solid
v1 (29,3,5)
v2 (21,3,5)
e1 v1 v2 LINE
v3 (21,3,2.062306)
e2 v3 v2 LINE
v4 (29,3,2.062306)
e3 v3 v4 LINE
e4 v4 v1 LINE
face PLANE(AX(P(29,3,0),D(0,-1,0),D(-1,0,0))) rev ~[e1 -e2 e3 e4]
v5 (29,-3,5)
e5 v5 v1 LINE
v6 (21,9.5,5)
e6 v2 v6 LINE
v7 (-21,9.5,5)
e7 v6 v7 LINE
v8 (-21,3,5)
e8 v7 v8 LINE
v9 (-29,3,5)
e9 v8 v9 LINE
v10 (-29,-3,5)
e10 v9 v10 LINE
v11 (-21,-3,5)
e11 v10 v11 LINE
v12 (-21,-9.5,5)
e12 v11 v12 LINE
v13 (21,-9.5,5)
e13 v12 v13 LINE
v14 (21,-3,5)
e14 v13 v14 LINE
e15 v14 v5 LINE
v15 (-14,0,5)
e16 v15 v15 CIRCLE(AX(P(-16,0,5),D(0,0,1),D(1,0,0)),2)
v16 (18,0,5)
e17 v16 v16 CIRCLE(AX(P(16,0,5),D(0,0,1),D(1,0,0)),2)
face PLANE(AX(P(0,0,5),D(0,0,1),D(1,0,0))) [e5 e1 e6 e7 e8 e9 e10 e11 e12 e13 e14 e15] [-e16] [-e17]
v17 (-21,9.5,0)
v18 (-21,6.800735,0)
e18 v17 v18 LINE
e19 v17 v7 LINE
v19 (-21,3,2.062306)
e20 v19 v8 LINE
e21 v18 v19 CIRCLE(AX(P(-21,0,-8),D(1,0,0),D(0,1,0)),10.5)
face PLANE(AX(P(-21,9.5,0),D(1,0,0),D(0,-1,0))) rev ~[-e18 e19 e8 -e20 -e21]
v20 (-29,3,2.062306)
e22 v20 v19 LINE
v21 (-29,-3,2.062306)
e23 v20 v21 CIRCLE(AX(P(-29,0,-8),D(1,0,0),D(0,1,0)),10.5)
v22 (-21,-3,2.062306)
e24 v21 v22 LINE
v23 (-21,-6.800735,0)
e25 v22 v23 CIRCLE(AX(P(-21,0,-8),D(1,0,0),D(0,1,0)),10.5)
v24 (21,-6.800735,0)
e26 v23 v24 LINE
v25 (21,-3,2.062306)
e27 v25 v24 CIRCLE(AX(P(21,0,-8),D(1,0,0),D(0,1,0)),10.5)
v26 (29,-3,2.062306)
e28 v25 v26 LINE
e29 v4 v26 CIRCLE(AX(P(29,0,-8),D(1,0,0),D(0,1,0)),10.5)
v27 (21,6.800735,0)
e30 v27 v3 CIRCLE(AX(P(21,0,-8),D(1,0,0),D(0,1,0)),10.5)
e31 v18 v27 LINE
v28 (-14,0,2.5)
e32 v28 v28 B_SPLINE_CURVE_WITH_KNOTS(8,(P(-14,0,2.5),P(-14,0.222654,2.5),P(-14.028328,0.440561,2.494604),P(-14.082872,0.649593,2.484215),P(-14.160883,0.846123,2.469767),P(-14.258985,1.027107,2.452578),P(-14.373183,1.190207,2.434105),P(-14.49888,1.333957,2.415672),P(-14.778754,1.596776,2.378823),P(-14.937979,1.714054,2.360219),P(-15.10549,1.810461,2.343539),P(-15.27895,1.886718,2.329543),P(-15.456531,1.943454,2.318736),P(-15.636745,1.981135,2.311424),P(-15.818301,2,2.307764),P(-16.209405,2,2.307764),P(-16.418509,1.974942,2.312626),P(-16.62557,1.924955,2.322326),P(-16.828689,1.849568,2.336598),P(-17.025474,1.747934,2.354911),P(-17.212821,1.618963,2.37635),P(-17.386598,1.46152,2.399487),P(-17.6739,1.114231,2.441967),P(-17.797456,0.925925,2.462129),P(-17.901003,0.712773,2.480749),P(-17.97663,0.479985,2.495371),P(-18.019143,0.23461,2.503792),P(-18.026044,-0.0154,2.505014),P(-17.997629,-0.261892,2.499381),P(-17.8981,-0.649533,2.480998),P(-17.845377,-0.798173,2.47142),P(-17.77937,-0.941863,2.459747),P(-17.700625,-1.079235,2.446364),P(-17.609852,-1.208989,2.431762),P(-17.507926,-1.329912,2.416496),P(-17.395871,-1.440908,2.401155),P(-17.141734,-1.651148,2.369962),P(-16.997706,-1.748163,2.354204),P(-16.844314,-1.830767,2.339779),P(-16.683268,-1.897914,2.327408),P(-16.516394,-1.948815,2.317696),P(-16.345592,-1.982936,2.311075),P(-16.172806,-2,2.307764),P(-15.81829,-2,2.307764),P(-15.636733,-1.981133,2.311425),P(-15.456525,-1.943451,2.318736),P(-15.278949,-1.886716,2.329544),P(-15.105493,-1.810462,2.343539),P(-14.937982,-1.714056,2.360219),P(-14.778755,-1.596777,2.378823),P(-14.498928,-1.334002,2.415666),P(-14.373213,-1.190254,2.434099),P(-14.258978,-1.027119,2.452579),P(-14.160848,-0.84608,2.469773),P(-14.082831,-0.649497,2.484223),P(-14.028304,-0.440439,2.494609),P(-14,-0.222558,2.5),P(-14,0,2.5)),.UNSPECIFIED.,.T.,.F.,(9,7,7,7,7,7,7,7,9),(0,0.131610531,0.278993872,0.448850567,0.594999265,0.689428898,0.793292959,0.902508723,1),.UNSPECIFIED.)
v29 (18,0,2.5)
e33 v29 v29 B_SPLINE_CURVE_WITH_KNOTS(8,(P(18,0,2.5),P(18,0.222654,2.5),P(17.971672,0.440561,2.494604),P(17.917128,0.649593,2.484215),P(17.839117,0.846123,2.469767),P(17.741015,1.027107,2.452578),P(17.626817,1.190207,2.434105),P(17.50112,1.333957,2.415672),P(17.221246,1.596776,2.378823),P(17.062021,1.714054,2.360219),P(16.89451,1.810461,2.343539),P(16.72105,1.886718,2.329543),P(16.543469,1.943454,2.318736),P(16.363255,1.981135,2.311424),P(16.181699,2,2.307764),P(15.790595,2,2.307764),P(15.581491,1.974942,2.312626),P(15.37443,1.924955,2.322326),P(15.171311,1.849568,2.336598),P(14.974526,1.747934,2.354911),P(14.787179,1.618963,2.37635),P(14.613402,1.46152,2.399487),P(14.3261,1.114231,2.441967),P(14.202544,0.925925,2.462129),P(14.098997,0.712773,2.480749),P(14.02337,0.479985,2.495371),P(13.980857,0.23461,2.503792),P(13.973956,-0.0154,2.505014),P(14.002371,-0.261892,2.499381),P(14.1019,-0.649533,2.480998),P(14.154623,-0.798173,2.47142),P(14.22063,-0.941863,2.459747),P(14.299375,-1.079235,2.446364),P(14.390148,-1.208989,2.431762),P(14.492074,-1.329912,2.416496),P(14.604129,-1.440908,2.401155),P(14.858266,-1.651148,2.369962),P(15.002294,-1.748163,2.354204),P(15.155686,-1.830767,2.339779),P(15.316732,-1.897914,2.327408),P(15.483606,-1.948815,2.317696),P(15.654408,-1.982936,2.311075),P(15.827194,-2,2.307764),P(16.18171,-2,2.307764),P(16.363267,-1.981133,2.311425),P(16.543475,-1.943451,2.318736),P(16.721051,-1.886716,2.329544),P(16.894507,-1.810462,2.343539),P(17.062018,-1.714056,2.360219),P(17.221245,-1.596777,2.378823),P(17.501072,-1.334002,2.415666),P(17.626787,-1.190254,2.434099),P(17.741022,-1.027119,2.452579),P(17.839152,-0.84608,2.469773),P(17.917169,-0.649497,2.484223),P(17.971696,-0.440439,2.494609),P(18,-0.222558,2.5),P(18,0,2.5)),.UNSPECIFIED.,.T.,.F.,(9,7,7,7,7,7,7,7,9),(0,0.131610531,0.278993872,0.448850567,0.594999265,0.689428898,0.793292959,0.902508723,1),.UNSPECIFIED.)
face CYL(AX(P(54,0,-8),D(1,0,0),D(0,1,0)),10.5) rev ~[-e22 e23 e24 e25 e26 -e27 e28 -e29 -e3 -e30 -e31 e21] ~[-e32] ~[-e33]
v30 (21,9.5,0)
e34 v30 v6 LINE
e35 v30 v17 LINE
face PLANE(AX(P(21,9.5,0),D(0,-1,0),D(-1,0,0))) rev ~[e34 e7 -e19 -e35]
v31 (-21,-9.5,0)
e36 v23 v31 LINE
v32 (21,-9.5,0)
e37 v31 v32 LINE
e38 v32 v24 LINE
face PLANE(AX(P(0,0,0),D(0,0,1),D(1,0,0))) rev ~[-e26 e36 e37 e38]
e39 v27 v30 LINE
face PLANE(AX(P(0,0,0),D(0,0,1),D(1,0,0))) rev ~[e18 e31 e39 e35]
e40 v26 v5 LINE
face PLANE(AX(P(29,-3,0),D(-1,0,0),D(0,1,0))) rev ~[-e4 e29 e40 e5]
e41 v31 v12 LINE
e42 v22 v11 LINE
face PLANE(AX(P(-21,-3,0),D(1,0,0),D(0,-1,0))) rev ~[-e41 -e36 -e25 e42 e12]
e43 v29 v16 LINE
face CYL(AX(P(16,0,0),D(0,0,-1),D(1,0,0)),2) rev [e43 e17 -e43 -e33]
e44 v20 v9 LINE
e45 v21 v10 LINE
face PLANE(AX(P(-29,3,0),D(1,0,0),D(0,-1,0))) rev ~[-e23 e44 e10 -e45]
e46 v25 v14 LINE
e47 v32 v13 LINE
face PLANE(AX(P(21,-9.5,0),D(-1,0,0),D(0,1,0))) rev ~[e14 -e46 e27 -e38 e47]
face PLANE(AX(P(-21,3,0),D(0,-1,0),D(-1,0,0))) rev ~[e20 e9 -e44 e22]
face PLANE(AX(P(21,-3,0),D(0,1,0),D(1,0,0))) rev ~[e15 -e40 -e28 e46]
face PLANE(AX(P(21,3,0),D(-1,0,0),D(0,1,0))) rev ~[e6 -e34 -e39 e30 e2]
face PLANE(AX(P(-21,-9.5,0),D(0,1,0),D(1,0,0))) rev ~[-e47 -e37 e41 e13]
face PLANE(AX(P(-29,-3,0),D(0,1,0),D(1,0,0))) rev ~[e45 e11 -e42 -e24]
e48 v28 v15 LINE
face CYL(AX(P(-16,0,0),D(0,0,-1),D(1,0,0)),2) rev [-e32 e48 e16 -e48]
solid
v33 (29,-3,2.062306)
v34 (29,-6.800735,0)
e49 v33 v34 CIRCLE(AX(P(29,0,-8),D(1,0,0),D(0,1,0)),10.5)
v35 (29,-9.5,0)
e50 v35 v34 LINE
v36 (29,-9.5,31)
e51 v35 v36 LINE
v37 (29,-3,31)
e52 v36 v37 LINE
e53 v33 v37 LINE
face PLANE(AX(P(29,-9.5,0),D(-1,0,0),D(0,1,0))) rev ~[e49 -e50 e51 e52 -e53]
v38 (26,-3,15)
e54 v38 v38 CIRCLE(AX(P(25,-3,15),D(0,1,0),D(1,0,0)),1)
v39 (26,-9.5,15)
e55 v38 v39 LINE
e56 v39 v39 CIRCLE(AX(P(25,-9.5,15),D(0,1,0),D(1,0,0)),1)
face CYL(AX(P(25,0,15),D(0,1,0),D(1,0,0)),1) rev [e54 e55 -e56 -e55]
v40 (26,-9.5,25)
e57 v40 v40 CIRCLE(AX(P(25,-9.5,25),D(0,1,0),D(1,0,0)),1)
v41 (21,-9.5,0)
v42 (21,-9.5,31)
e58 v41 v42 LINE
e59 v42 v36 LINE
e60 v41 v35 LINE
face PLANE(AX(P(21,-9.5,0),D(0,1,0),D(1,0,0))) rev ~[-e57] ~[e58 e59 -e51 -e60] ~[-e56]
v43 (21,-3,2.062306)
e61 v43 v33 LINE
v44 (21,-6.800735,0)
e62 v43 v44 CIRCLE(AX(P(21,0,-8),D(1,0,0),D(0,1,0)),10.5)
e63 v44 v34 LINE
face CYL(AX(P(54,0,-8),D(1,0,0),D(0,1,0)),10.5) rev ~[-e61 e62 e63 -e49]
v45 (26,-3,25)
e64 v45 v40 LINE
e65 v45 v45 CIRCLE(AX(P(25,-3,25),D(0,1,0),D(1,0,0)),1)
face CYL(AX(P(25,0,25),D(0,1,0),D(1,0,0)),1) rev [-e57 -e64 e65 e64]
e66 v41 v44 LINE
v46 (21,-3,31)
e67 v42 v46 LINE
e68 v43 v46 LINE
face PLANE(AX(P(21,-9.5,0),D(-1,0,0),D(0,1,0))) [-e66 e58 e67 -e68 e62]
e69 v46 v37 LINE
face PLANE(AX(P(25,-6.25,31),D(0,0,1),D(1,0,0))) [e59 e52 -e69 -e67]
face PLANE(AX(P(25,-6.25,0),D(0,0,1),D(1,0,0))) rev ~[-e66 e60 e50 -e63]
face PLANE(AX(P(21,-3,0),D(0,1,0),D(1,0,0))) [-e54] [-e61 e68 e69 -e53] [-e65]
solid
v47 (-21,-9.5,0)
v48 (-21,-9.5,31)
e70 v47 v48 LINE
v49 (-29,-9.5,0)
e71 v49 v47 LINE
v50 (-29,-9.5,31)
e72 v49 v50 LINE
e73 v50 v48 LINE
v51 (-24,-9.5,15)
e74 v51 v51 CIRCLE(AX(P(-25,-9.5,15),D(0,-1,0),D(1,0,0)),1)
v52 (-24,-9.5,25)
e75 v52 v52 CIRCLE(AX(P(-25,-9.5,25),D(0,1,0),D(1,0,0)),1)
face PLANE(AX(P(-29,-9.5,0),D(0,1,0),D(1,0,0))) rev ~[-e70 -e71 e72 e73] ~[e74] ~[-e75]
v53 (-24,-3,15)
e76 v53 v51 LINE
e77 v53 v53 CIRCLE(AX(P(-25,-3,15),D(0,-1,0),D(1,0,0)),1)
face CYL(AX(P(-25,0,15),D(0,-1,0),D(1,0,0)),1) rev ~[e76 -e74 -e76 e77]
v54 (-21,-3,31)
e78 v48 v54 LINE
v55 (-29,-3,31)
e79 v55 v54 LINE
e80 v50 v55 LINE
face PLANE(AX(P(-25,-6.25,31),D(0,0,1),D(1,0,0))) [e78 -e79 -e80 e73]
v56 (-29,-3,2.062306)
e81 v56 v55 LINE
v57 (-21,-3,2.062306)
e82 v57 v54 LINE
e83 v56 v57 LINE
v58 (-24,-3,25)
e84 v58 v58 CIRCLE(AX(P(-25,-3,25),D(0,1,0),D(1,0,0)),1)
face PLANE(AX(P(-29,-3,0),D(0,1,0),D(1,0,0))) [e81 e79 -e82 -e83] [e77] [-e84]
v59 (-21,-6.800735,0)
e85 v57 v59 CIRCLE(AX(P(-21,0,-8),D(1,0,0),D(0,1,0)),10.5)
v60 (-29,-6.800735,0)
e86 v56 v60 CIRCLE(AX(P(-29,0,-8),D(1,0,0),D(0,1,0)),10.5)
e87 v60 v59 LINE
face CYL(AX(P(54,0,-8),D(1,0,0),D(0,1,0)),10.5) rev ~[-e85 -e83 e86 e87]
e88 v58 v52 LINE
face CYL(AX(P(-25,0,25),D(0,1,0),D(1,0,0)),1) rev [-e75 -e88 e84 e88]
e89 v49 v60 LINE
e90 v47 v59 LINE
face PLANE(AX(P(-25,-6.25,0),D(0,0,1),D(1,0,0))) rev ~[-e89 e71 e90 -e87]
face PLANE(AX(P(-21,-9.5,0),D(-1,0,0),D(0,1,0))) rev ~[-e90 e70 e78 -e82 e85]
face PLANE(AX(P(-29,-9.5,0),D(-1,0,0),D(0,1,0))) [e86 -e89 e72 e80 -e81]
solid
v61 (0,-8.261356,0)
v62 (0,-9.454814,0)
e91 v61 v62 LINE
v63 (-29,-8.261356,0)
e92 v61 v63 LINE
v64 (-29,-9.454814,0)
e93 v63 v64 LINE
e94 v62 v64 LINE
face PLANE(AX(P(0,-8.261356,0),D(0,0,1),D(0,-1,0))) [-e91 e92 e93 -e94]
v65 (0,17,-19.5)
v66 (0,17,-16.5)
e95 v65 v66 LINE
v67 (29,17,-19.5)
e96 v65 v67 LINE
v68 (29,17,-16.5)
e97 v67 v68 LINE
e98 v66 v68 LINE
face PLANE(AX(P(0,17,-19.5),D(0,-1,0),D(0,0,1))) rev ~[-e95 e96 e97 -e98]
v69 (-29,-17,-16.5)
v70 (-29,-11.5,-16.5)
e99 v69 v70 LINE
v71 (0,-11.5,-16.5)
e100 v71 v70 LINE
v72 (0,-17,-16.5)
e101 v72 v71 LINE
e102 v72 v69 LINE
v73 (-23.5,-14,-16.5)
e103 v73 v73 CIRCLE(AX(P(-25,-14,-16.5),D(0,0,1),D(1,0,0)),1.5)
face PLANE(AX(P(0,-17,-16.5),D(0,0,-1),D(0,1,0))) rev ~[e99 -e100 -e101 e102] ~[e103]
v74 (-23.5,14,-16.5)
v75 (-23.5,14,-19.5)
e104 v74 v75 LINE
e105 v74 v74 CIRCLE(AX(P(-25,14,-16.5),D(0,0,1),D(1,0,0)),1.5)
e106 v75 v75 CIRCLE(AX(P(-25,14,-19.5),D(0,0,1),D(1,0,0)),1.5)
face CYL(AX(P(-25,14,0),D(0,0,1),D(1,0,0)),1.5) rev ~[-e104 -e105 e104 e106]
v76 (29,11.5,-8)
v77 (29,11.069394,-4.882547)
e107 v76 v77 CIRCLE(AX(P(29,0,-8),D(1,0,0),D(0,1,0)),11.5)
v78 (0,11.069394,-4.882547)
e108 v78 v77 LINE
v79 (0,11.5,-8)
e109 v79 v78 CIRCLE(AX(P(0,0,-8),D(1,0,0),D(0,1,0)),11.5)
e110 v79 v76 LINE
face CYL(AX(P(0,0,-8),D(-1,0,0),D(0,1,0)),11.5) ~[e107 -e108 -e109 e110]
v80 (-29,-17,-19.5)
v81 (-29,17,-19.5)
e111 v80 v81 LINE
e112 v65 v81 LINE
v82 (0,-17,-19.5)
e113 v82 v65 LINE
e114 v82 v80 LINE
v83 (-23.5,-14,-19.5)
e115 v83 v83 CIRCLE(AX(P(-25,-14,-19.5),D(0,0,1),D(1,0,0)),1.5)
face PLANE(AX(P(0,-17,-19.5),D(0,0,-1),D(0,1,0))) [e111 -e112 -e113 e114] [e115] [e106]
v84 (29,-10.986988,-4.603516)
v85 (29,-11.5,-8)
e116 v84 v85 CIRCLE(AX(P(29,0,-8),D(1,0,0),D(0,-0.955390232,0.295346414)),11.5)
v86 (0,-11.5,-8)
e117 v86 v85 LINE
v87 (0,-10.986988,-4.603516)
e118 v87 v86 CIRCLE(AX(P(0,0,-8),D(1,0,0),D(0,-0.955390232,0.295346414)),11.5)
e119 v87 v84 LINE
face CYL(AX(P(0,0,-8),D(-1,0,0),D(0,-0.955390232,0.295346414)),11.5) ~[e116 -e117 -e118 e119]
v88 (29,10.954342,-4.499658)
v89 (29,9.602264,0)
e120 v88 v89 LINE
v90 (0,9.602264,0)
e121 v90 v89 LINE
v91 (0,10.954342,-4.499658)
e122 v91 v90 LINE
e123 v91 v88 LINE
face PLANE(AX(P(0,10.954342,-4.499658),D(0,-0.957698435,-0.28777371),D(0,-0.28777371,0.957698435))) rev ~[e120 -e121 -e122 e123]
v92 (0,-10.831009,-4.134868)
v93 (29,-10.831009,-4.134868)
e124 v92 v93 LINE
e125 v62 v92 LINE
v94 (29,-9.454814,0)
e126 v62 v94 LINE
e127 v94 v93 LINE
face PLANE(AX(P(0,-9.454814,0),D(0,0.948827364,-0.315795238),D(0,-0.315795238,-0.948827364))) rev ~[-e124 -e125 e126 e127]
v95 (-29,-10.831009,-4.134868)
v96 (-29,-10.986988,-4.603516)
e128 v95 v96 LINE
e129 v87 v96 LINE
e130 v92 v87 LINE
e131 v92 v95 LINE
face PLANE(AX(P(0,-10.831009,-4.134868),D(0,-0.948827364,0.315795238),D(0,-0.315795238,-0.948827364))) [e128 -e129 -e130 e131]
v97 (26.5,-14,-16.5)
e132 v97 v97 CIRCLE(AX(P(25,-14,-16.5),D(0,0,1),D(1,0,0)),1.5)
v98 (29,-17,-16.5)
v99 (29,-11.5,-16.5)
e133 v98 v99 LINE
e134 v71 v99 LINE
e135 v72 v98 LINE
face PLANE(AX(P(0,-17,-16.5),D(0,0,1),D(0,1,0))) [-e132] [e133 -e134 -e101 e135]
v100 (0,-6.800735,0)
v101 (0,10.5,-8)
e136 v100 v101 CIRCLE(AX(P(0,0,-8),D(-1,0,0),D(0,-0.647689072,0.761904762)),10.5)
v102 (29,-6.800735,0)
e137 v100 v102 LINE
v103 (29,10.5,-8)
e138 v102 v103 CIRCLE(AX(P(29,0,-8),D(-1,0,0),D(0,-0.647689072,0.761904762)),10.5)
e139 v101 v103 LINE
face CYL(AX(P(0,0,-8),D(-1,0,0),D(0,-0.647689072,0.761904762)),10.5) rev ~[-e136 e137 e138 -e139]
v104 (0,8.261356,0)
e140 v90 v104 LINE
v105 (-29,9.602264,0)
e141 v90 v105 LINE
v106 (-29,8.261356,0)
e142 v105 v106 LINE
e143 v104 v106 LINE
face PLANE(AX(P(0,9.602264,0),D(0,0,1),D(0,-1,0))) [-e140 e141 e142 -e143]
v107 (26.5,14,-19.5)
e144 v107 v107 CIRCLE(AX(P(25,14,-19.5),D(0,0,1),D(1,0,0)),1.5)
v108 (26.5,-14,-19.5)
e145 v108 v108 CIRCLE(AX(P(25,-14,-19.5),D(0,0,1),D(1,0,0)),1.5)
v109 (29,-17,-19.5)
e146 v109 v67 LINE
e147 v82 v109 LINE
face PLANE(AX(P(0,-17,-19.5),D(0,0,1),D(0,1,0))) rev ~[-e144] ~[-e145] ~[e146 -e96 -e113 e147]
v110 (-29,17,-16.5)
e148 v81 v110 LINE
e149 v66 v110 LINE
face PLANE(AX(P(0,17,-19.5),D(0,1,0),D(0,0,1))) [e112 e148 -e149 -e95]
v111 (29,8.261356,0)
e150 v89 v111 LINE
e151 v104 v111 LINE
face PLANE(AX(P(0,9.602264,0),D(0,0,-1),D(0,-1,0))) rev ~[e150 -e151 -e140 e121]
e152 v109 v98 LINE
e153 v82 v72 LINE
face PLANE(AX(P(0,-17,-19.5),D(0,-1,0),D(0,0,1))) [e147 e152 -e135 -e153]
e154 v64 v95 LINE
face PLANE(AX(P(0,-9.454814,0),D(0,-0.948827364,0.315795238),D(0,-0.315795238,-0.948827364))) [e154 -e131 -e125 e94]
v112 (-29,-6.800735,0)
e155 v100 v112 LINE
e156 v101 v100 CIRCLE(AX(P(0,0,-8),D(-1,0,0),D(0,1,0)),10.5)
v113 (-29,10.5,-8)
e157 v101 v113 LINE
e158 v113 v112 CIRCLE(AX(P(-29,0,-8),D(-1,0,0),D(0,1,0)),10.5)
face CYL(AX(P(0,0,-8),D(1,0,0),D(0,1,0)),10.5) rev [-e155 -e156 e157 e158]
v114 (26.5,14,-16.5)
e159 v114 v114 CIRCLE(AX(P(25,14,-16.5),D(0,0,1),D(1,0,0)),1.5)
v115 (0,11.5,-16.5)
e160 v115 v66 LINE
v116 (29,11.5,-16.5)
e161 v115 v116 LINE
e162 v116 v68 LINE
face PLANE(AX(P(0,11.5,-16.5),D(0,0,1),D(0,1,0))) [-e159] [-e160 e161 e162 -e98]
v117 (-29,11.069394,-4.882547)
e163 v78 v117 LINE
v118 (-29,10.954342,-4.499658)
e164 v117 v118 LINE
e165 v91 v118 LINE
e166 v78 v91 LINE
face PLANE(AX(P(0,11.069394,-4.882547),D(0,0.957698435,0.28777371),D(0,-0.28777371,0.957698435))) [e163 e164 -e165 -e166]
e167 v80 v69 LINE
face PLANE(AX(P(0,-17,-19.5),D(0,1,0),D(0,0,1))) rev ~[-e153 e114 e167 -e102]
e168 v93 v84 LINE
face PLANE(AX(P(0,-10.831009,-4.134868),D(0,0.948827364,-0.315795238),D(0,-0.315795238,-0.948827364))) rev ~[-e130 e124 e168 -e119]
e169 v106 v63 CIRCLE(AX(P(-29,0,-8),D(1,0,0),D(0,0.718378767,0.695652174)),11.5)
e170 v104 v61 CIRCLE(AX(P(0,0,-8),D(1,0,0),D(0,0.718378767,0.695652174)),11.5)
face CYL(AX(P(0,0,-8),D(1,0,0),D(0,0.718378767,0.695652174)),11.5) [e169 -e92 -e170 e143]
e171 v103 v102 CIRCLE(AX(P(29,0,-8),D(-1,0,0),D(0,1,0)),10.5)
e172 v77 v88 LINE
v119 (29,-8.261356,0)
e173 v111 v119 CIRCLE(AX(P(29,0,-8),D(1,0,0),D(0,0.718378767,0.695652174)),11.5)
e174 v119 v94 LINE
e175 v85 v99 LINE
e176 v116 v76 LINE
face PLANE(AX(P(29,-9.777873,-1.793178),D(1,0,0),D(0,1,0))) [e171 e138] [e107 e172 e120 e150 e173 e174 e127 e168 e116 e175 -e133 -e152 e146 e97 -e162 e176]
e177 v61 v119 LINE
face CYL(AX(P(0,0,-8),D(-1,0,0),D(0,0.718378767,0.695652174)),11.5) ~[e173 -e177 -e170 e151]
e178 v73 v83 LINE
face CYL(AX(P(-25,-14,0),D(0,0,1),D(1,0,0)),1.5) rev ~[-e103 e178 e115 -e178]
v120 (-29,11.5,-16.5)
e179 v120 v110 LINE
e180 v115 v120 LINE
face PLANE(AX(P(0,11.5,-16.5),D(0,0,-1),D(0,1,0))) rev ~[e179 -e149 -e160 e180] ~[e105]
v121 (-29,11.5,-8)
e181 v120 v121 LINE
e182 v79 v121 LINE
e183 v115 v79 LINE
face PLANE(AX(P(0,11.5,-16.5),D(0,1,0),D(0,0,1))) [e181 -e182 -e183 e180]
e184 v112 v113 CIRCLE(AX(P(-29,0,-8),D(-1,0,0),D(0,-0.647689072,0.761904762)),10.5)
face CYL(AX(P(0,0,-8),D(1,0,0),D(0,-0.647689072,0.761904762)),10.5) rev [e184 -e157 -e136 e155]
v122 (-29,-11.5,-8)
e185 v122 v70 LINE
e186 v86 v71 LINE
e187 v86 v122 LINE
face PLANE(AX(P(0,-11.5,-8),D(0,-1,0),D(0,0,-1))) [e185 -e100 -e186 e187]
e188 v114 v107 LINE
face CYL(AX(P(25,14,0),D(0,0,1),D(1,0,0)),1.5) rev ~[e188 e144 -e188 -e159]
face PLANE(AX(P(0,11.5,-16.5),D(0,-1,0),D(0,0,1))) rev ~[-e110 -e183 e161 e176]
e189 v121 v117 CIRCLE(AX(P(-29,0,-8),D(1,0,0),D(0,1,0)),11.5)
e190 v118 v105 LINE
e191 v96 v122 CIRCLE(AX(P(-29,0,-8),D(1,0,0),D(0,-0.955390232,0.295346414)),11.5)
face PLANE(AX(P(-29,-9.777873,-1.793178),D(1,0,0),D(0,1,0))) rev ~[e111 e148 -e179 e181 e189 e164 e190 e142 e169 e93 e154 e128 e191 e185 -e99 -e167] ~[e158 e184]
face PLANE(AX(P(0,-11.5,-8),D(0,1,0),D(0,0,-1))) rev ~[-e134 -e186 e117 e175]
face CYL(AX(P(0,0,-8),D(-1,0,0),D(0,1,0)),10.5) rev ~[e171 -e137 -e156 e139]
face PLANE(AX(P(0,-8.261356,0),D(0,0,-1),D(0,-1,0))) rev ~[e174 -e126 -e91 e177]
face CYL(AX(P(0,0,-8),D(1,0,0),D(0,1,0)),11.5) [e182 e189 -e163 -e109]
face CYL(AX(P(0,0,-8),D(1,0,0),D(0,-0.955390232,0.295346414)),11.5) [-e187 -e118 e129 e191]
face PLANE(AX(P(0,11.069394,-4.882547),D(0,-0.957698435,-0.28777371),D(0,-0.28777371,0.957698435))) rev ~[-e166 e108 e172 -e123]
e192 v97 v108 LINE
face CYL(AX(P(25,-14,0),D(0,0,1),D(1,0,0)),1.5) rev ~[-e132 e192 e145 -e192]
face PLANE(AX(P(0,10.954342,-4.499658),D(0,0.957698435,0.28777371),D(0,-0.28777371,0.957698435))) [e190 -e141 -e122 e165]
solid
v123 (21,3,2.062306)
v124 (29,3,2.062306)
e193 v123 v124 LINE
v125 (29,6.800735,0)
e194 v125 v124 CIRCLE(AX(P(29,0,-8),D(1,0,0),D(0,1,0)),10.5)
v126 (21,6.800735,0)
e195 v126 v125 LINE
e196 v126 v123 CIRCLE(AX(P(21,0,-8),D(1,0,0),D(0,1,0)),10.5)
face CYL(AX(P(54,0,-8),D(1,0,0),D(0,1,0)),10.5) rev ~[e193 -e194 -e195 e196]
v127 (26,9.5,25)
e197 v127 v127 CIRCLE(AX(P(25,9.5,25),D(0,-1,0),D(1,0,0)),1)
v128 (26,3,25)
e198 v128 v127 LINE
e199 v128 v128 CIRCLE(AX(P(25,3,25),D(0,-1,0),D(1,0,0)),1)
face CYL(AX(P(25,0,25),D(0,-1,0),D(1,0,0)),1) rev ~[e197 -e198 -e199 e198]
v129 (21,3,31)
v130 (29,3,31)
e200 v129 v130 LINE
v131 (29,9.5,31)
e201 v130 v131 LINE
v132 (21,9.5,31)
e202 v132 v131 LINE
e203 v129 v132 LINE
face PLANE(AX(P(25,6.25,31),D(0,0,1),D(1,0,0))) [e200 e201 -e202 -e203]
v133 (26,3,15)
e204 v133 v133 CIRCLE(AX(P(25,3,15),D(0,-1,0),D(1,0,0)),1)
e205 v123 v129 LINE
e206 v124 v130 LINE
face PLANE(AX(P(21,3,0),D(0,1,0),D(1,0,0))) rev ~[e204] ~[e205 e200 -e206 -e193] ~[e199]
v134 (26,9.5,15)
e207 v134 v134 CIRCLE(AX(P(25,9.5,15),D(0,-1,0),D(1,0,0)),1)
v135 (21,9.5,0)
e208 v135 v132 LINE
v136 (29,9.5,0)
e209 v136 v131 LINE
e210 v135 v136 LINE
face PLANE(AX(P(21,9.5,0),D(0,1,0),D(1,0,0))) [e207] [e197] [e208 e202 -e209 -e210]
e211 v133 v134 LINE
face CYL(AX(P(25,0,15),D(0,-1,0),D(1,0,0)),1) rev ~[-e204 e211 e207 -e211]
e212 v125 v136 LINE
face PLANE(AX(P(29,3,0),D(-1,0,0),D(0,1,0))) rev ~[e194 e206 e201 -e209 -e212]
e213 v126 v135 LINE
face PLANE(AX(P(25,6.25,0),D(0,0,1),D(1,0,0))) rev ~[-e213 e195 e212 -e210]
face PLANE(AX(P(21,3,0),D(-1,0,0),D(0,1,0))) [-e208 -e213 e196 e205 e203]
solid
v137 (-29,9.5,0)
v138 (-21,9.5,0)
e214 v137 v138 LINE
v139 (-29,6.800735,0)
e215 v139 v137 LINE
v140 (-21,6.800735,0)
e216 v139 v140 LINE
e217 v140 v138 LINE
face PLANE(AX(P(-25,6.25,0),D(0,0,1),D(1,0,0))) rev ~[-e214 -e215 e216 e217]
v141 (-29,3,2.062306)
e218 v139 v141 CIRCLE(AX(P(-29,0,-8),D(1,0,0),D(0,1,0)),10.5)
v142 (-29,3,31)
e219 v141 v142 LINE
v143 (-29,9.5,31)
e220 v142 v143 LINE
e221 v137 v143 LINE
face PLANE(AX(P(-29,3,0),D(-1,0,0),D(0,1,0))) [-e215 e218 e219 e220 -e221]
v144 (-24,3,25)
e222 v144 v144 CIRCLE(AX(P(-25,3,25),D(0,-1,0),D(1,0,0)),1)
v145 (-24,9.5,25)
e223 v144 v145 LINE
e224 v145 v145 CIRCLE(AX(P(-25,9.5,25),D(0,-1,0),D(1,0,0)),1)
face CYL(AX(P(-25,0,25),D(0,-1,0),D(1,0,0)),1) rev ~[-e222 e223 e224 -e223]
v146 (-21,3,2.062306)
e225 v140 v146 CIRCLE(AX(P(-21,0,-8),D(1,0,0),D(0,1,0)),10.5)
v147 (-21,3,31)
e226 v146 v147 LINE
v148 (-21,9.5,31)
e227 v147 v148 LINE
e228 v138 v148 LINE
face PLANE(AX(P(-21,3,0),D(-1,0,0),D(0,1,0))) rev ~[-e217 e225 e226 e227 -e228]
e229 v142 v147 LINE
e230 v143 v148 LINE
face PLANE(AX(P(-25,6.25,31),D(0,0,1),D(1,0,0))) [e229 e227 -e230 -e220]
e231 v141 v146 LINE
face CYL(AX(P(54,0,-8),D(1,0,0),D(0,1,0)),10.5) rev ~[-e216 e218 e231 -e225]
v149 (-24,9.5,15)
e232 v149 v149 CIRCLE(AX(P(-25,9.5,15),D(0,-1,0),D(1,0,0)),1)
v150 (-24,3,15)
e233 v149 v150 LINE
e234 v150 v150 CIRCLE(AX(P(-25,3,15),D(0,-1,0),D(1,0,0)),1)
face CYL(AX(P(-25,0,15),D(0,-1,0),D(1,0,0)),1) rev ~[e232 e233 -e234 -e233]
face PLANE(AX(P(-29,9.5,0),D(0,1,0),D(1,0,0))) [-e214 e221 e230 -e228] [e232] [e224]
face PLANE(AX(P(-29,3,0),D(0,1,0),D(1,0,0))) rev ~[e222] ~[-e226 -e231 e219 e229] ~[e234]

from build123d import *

# Parameters (mm, degrees)
F0_W      = 8
F0_H      = 6.5
F1_DEPTH  = 31
F0_R      = 2
F2_DEPTH  = 5
F3_R      = 1
F4_DEPTH  = 12.5
F5_W      = 5.5
F5_H      = 3
F6_DEPTH  = 29
F9_R      = 10.5
F10_DEPTH = 83.001
F0_R_2    = 1.5
F11_DEPTH = 19.501


# Not quite as in the source:
# - the program builds the solid bodies; features that only make, move or delete a surface that nothing else refers to are left out


with BuildPart() as f1:
    # F0 (on Top) → F1 (new body)
    with BuildSketch(Plane.XY):
        with Locations((-25, 6.25)):
            Rectangle(F0_W, F0_H)
    extrude(amount=F1_DEPTH)


with BuildPart() as f1b:
    # F0 (on Top) → F1, piece 2 (new body)
    with BuildSketch(Plane.XY):
        with Locations((-25, -6.25)):
            Rectangle(F0_W, F0_H)
    extrude(amount=F1_DEPTH)


with BuildPart() as f1c:
    # F0 (on Top) → F1, piece 3 (new body)
    with BuildSketch(Plane.XY):
        with Locations((25, 6.25)):
            Rectangle(F0_W, F0_H)
    extrude(amount=F1_DEPTH)


with BuildPart() as f1d:
    # F0 (on Top) → F1, piece 4 (new body)
    with BuildSketch(Plane.XY):
        with Locations((25, -6.25)):
            Rectangle(F0_W, F0_H)
    extrude(amount=F1_DEPTH)


with BuildPart() as f2:
    # F0 (on Top) → F2 (new body)
    with BuildSketch(Plane.XY):
        Polygon((-21, -9.5), (21, -9.5), (21, -3), (29, -3), (29, 3), (21, 3), (21, 9.5), (-21, 9.5), (-21, 3), (-29, 3), (-29, -3), (-21, -3), align=None)
        with Locations((-16, 0)):
            Circle(F0_R, mode=Mode.SUBTRACT)
        with Locations((16, 0)):
            Circle(F0_R, mode=Mode.SUBTRACT)
    extrude(amount=F2_DEPTH)


with BuildPart() as f4_tool:
    # F3 (on Front) → F4 (new body, symmetric)
    with BuildSketch(Plane.XZ):
        with Locations((25, 25)):
            Circle(F3_R)
        with Locations((25, 15)):
            Circle(F3_R)
        with Locations((-25, 25)):
            Circle(F3_R)
        with Locations((-25, 15)):
            Circle(F3_R)
    extrude(amount=F4_DEPTH, both=True)


with BuildPart() as f1_1:
    add(f1.part)

    # F4: cut by f4_tool
    add(f4_tool.part, mode=Mode.SUBTRACT)


with BuildPart() as f1b_1:
    add(f1b.part)

    # F4: cut by f4_tool
    add(f4_tool.part, mode=Mode.SUBTRACT)


with BuildPart() as f1c_1:
    add(f1c.part)

    # F4: cut by f4_tool
    add(f4_tool.part, mode=Mode.SUBTRACT)


with BuildPart() as f1d_1:
    add(f1d.part)

    # F4: cut by f4_tool
    add(f4_tool.part, mode=Mode.SUBTRACT)


with BuildPart() as f6:
    # F5 (on Right) → F6 (new body, symmetric)
    with BuildSketch(Plane.YZ):
        with BuildLine():
            ThreePointArc((-10.8310090403, -4.1348682857), (-9.7674911279, -1.9298997482), (-8.2613558209, 0))
            Line((-8.2613558209, 0), (-9.4548137859, 0))
            Line((-9.4548137859, 0), (-10.8310090403, -4.1348682857))
        make_face()
        with BuildLine():
            ThreePointArc((6.8007352544, 0), (9.5304176239, -3.5930577591), (10.5, -8))
            ThreePointArc((10.5, -8), (-4.4069422409, -17.5304176239), (-6.8007352544, 0))
            Line((-6.8007352544, 0), (-8.2613558209, 0))
            ThreePointArc((-8.2613558209, 0), (-9.7674911279, -1.9298997482), (-10.8310090403, -4.1348682857))
            Line((-10.8310090403, -4.1348682857), (-10.9869876699, -4.6035162385))
            ThreePointArc((-10.9869876699, -4.6035162385), (-11.3710236611, -6.2824957356), (-11.5, -8))
            ThreePointArc((-11.5, -8), (-8.1317279836, -16.1317279836), (0, -19.5))
            ThreePointArc((0, -19.5), (8.1317279836, -16.1317279836), (11.5, -8))
            ThreePointArc((11.5, -8), (11.3918398808, -6.4264739816), (11.0693940642, -4.8825467043))
            Line((11.0693940642, -4.8825467043), (10.9543418745, -4.499658003))
            ThreePointArc((10.9543418745, -4.499658003), (9.8677499977, -2.0942815862), (8.2613558209, 0))
            Line((8.2613558209, 0), (6.8007352544, 0))
        make_face()
        with BuildLine():
            Line((9.6022635698, 0), (8.2613558209, 0))
            ThreePointArc((8.2613558209, 0), (9.8677499977, -2.0942815862), (10.9543418745, -4.499658003))
            Line((10.9543418745, -4.499658003), (9.6022635698, 0))
        make_face()
        with BuildLine():
            ThreePointArc((6.8007352544, 0), (9.5304176239, -3.5930577591), (10.5, -8))
            ThreePointArc((10.5, -8), (-4.4069422409, -17.5304176239), (-6.8007352544, 0))
            Line((-6.8007352544, 0), (-8.2613558209, 0))
            ThreePointArc((-8.2613558209, 0), (-9.7674911279, -1.9298997482), (-10.8310090403, -4.1348682857))
            Line((-10.8310090403, -4.1348682857), (-10.9869876699, -4.6035162385))
            ThreePointArc((-10.9869876699, -4.6035162385), (-11.3710236611, -6.2824957356), (-11.5, -8))
            ThreePointArc((-11.5, -8), (-8.1317279836, -16.1317279836), (0, -19.5))
            ThreePointArc((0, -19.5), (8.1317279836, -16.1317279836), (11.5, -8))
            ThreePointArc((11.5, -8), (11.3918398808, -6.4264739816), (11.0693940642, -4.8825467043))
            Line((11.0693940642, -4.8825467043), (10.9543418745, -4.499658003))
            ThreePointArc((10.9543418745, -4.499658003), (9.8677499977, -2.0942815862), (8.2613558209, 0))
            Line((8.2613558209, 0), (6.8007352544, 0))
        make_face()
        with BuildLine():
            ThreePointArc((-6.8007352544, 0), (0, 2.5), (6.8007352544, 0))
            Line((6.8007352544, 0), (8.2613558209, 0))
            ThreePointArc((8.2613558209, 0), (0, 3.5), (-8.2613558209, 0))
            Line((-8.2613558209, 0), (-6.8007352544, 0))
        make_face()
        with BuildLine():
            ThreePointArc((6.8007352544, 0), (9.5304176239, -3.5930577591), (10.5, -8))
            ThreePointArc((10.5, -8), (-4.4069422409, -17.5304176239), (-6.8007352544, 0))
            Line((-6.8007352544, 0), (-8.2613558209, 0))
            ThreePointArc((-8.2613558209, 0), (-9.7674911279, -1.9298997482), (-10.8310090403, -4.1348682857))
            Line((-10.8310090403, -4.1348682857), (-10.9869876699, -4.6035162385))
            ThreePointArc((-10.9869876699, -4.6035162385), (-11.3710236611, -6.2824957356), (-11.5, -8))
            ThreePointArc((-11.5, -8), (-8.1317279836, -16.1317279836), (0, -19.5))
            ThreePointArc((0, -19.5), (8.1317279836, -16.1317279836), (11.5, -8))
            ThreePointArc((11.5, -8), (11.3918398808, -6.4264739816), (11.0693940642, -4.8825467043))
            Line((11.0693940642, -4.8825467043), (10.9543418745, -4.499658003))
            ThreePointArc((10.9543418745, -4.499658003), (9.8677499977, -2.0942815862), (8.2613558209, 0))
            Line((8.2613558209, 0), (6.8007352544, 0))
        make_face()
        with BuildLine():
            Line((11.5, -16.5), (11.5, -8))
            ThreePointArc((11.5, -8), (8.1317279836, -16.1317279836), (0, -19.5))
            Line((0, -19.5), (11.5, -19.5))
            Line((11.5, -19.5), (11.5, -16.5))
        make_face()
        with BuildLine():
            ThreePointArc((0, -19.5), (-8.1317279836, -16.1317279836), (-11.5, -8))
            Line((-11.5, -8), (-11.5, -16.5))
            Line((-11.5, -16.5), (-11.5, -19.5))
            Line((-11.5, -19.5), (0, -19.5))
        make_face()
        with Locations((-14.25, -18)):
            Rectangle(F5_W, F5_H)
        with Locations((14.25, -18)):
            Rectangle(F5_W, F5_H)
        with BuildLine():
            ThreePointArc((-6.8007352544, 0), (0, 2.5), (6.8007352544, 0))
            Line((6.8007352544, 0), (8.2613558209, 0))
            ThreePointArc((8.2613558209, 0), (0, 3.5), (-8.2613558209, 0))
            Line((-8.2613558209, 0), (-6.8007352544, 0))
        make_face()
    extrude(amount=F6_DEPTH, both=True)

    # F0 (on Top) → F11 (cut, through all)
    with BuildSketch(Plane.XY):
        with Locations((-25, -14)):
            Circle(F0_R_2)
        with Locations((25, -14)):
            Circle(F0_R_2)
        with Locations((-25, 14)):
            Circle(F0_R_2)
        with Locations((25, 14)):
            Circle(F0_R_2)
    extrude(amount=-F11_DEPTH, mode=Mode.SUBTRACT)


with BuildPart() as f10_tool:
    # F9 (on offset) → F10 (new body, through all)
    with BuildSketch(Plane.YZ.offset(54)):
        with Locations((0, -8)):
            Circle(F9_R)
    extrude(amount=-F10_DEPTH)


with BuildPart() as f1_2:
    add(f1_1.part)

    # F10: cut by f10_tool
    add(f10_tool.part, mode=Mode.SUBTRACT)


with BuildPart() as f1b_2:
    add(f1b_1.part)

    # F10: cut by f10_tool
    add(f10_tool.part, mode=Mode.SUBTRACT)


with BuildPart() as f1c_2:
    add(f1c_1.part)

    # F10: cut by f10_tool
    add(f10_tool.part, mode=Mode.SUBTRACT)


with BuildPart() as f1d_2:
    add(f1d_1.part)

    # F10: cut by f10_tool
    add(f10_tool.part, mode=Mode.SUBTRACT)


with BuildPart() as f2_1:
    add(f2.part)

    # F10: cut by f10_tool
    add(f10_tool.part, mode=Mode.SUBTRACT)


solid = Compound([f6.part, f1_2.part, f1b_2.part, f1c_2.part, f1d_2.part, f2_1.part])
